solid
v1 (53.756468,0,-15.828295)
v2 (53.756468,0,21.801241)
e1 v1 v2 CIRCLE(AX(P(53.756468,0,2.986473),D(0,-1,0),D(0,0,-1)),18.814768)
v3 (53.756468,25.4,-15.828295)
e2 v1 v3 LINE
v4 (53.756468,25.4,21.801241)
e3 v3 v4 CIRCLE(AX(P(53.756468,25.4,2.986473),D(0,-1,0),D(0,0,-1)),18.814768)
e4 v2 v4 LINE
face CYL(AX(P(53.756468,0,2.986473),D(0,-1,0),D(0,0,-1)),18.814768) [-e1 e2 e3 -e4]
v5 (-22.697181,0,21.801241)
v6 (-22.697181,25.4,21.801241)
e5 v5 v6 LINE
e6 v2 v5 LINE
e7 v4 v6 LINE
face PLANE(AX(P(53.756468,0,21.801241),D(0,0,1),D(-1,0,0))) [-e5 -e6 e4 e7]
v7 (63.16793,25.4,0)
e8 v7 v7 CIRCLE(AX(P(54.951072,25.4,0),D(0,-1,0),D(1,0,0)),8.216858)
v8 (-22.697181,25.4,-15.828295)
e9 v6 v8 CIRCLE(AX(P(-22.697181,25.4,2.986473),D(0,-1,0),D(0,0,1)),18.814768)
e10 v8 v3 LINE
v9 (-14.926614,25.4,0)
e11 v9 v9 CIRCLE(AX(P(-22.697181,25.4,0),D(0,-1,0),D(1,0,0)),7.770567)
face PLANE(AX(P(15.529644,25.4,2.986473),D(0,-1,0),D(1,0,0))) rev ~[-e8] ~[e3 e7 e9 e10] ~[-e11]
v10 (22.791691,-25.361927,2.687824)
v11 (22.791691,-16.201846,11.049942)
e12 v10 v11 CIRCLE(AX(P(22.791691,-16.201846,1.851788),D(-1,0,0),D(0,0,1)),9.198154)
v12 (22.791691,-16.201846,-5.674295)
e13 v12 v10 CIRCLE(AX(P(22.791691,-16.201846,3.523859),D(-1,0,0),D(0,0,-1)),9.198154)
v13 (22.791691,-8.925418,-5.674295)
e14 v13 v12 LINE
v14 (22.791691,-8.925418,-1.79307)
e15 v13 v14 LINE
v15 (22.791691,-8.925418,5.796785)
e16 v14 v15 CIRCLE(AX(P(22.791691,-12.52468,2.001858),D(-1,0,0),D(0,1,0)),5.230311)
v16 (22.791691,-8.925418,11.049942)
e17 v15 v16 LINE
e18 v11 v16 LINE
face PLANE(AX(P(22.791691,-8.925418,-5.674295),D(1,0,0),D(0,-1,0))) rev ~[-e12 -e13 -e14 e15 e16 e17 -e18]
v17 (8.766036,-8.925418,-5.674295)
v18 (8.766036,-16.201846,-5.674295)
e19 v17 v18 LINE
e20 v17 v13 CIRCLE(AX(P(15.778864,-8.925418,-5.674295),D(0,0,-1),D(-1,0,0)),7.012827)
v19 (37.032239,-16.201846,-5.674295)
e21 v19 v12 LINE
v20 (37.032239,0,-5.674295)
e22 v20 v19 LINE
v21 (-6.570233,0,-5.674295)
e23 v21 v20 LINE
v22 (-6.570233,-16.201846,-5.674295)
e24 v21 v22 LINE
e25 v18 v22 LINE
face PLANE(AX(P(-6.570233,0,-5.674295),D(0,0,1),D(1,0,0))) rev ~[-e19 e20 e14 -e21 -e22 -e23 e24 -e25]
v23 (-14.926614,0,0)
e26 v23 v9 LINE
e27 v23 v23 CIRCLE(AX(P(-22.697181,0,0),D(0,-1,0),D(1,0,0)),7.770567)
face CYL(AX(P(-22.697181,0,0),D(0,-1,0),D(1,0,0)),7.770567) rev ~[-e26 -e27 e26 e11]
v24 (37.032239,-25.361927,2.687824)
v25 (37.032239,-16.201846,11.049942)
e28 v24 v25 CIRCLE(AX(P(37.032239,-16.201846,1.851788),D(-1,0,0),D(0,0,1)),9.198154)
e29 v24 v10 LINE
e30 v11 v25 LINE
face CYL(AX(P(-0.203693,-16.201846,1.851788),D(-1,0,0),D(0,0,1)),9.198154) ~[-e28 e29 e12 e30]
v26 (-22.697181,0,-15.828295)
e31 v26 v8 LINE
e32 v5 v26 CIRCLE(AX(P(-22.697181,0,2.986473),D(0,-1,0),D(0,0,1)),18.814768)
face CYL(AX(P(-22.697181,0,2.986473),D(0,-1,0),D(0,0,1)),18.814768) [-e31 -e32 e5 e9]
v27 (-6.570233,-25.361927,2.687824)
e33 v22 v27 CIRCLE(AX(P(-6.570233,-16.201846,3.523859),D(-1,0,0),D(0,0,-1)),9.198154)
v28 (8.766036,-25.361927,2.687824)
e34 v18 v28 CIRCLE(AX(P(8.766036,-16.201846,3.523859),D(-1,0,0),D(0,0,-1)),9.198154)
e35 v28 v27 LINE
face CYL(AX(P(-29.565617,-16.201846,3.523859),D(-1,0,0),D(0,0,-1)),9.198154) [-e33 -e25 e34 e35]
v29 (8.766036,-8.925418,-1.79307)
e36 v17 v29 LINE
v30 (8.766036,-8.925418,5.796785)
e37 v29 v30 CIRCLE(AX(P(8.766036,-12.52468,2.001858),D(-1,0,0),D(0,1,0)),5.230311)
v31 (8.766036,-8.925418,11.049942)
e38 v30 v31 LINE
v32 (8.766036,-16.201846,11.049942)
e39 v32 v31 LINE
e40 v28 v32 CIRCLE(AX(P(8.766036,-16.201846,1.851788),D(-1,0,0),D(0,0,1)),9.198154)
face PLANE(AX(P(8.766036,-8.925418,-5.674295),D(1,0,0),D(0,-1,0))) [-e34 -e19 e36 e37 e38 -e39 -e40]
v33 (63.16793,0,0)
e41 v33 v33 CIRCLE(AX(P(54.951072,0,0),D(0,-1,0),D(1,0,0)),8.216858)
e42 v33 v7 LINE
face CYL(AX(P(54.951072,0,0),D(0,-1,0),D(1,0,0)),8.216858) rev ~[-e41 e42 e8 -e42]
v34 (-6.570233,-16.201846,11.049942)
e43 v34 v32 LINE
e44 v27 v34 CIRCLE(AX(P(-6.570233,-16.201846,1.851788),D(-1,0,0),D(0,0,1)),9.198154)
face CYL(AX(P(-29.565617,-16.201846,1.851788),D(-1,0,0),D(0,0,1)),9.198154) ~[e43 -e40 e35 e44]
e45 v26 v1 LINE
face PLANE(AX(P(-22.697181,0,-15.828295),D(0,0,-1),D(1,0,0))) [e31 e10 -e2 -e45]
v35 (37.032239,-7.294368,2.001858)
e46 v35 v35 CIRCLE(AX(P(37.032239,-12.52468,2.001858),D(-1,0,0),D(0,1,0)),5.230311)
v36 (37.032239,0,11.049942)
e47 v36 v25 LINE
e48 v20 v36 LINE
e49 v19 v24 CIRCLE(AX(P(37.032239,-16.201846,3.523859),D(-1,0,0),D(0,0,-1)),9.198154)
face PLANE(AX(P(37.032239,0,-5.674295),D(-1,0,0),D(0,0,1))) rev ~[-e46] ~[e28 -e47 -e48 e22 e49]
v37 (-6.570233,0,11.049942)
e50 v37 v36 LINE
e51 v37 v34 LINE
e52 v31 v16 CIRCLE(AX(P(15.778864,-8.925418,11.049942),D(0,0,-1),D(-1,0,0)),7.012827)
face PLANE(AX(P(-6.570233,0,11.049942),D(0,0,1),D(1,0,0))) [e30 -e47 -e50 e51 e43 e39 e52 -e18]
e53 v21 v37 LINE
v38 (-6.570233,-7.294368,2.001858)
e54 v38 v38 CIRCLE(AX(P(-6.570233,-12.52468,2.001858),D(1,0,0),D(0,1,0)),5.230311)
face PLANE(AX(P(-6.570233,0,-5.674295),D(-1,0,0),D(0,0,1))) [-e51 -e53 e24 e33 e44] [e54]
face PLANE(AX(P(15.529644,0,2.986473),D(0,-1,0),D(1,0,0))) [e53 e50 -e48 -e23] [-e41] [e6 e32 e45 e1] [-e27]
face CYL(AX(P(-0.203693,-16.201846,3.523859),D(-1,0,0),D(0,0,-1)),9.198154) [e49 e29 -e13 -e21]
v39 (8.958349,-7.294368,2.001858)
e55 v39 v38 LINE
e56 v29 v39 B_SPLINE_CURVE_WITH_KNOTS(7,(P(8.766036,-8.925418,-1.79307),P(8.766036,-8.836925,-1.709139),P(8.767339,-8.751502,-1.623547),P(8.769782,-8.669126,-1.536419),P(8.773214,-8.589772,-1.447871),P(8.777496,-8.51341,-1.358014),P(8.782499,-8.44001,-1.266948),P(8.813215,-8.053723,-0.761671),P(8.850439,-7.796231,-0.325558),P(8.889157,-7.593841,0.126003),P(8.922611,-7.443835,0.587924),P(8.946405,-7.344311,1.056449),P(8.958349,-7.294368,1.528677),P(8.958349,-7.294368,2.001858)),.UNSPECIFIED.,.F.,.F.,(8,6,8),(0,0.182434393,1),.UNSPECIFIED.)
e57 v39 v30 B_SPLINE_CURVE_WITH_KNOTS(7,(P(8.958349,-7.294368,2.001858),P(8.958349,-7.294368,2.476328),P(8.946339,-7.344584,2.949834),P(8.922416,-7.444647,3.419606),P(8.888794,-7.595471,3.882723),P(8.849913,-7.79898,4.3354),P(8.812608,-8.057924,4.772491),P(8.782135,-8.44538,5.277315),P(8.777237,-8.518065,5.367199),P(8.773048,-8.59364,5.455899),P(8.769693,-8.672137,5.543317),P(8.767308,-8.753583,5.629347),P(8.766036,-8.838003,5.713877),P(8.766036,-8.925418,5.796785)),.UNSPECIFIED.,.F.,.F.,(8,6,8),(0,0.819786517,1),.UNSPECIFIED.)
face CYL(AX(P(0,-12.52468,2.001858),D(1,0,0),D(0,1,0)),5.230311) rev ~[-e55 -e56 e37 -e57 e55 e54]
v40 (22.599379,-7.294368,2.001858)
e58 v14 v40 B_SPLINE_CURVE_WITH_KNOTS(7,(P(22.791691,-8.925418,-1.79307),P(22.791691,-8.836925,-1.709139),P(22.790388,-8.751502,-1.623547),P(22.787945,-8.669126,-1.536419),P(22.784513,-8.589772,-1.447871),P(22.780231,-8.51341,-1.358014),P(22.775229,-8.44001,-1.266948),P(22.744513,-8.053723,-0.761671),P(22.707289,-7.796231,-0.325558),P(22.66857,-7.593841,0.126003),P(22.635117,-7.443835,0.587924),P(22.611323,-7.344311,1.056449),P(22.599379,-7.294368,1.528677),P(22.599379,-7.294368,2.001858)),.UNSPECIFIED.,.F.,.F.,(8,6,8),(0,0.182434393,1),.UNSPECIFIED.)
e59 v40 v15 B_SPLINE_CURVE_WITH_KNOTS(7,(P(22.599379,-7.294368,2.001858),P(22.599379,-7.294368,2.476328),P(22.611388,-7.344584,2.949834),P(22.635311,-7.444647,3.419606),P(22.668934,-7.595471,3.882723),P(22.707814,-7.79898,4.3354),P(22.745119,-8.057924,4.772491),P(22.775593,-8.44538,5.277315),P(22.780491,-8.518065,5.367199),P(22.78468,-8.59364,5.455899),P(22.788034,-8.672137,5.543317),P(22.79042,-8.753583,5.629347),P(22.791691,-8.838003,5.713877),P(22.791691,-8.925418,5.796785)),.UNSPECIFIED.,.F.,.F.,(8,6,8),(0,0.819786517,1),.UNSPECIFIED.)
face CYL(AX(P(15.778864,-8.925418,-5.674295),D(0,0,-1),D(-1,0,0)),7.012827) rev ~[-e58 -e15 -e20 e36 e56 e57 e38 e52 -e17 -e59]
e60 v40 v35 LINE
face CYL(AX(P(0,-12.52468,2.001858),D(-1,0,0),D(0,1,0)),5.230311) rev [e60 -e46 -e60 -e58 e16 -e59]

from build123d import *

# Parameters (mm, degrees)
F1_DEPTH     = 25.4
F2_R         = 7.7705666036
F2_R_2       = 8.2168581005
F3_DEPTH     = 25.4
F4_W         = 43.6024717055
F4_H         = 16.7242367752
F5_DEPTH     = 25.4
F6_R         = 5.2303111982
F7_DEPTH     = 66.548
F8_DEPTH     = 50.546
F9_W         = 14.0256546438
F9_H         = 16.4745816305
F10_DEPTH    = 27.4765354039
F11_T1_DEPTH = 61.3270374103
F11_T3_DEPTH = 60.2313163778


# Not quite as in the source:
# - a fillet or chamfer that OpenCascade refuses, or shapes differently, is made with other operations: its cross-section is extruded or revolved along the edge and cut away or added


with BuildPart() as f1:
    # F0 (on Front) → F1 (new body)
    with BuildSketch(Plane.XZ):
        with BuildLine():
            Line((53.756467998, 21.8012407422), (-22.6971805096, 21.8012407422))
            ThreePointArc((-22.6971805096, 21.8012407422), (-41.5119482204, 2.9864730313), (-22.6971805096, -15.8282946795))
            Line((-22.6971805096, -15.8282946795), (53.756467998, -15.8282946795))
            ThreePointArc((53.756467998, -15.8282946795), (72.5712357089, 2.9864730313), (53.756467998, 21.8012407422))
        make_face()
    extrude(amount=-F1_DEPTH)

    # F2 (on Front) → F3 (cut)
    with BuildSketch(Plane.XZ):
        with Locations((-22.6971805096, 0)):
            Circle(F2_R)
        with Locations((54.9510717392, 0)):
            Circle(F2_R_2)
    extrude(amount=-F3_DEPTH, mode=Mode.SUBTRACT)

    # F4 (on Front) → F5 (join)
    with BuildSketch(Plane.XZ):
        with Locations((15.2310032863, 2.6878237259)):
            Rectangle(F4_W, F4_H)
    extrude(amount=F5_DEPTH)

    # F6 (on Right) → F7 (cut)
    with BuildSketch(Plane.YZ):
        with Locations((-12.524679536, 2.001857613)):
            Circle(F6_R)
    extrude(amount=F7_DEPTH, mode=Mode.SUBTRACT)

    # F6 (on Right) → F8 (cut)
    with BuildSketch(Plane.YZ):
        with Locations((-12.524679536, 2.001857613)):
            Circle(F6_R)
    extrude(amount=-F8_DEPTH, mode=Mode.SUBTRACT)

    # F9 (on face) → F10 (cut, through all)
    with BuildSketch(Plane(origin=(0, 0, -5.6742946617), x_dir=(1, 0, 0), z_dir=(0, 0, -1))):
        with Locations((15.7788638026, 17.1627091847)):
            Rectangle(F9_W, F9_H)
        with BuildLine():
            Line((22.7916911244, 8.9254183695), (8.7660364807, 8.9254183695))
            ThreePointArc((8.7660364807, 8.9254183695), (15.7788638026, 1.9125910476), (22.7916911244, 8.9254183695))
        make_face()
    extrude(amount=-F10_DEPTH, mode=Mode.SUBTRACT)

    # F11: fillet of radius 9.1981536726 on 4 edges, made by hand

    # F11_s2 → F11_t1 (cut)
    with BuildSketch(Plane.YZ.offset(-29.565616748)):
        with BuildLine():
            ThreePointArc((-16.2018463274, -5.6742946617), (-22.7059231637, -2.9802178254), (-25.4, 3.5238590109))
            Line((-25.4, 3.5238590109), (-25.4, -5.6742946617))
            Line((-25.4, -5.6742946617), (-16.2018463274, -5.6742946617))
        make_face()
        with BuildLine():
            ThreePointArc((-16.2018463274, 11.0499421135), (-22.7059231637, 8.3558652771), (-25.4, 1.8517884408))
            Line((-25.4, 1.8517884408), (-25.4, 11.0499421135))
            Line((-25.4, 11.0499421135), (-16.2018463274, 11.0499421135))
        make_face()
    extrude(amount=F11_T1_DEPTH, mode=Mode.SUBTRACT)

    # F11_s4 → F11_t3 (cut)
    with BuildSketch(Plane.YZ.offset(-0.2036930572)):
        with BuildLine():
            ThreePointArc((-16.2018463274, -5.6742946617), (-22.7059231637, -2.9802178254), (-25.4, 3.5238590109))
            Line((-25.4, 3.5238590109), (-25.4, -5.6742946617))
            Line((-25.4, -5.6742946617), (-16.2018463274, -5.6742946617))
        make_face()
        with BuildLine():
            ThreePointArc((-16.2018463274, 11.0499421135), (-22.7059231637, 8.3558652771), (-25.4, 1.8517884408))
            Line((-25.4, 1.8517884408), (-25.4, 11.0499421135))
            Line((-25.4, 11.0499421135), (-16.2018463274, 11.0499421135))
        make_face()
    extrude(amount=F11_T3_DEPTH, mode=Mode.SUBTRACT)


solid = f1.part
